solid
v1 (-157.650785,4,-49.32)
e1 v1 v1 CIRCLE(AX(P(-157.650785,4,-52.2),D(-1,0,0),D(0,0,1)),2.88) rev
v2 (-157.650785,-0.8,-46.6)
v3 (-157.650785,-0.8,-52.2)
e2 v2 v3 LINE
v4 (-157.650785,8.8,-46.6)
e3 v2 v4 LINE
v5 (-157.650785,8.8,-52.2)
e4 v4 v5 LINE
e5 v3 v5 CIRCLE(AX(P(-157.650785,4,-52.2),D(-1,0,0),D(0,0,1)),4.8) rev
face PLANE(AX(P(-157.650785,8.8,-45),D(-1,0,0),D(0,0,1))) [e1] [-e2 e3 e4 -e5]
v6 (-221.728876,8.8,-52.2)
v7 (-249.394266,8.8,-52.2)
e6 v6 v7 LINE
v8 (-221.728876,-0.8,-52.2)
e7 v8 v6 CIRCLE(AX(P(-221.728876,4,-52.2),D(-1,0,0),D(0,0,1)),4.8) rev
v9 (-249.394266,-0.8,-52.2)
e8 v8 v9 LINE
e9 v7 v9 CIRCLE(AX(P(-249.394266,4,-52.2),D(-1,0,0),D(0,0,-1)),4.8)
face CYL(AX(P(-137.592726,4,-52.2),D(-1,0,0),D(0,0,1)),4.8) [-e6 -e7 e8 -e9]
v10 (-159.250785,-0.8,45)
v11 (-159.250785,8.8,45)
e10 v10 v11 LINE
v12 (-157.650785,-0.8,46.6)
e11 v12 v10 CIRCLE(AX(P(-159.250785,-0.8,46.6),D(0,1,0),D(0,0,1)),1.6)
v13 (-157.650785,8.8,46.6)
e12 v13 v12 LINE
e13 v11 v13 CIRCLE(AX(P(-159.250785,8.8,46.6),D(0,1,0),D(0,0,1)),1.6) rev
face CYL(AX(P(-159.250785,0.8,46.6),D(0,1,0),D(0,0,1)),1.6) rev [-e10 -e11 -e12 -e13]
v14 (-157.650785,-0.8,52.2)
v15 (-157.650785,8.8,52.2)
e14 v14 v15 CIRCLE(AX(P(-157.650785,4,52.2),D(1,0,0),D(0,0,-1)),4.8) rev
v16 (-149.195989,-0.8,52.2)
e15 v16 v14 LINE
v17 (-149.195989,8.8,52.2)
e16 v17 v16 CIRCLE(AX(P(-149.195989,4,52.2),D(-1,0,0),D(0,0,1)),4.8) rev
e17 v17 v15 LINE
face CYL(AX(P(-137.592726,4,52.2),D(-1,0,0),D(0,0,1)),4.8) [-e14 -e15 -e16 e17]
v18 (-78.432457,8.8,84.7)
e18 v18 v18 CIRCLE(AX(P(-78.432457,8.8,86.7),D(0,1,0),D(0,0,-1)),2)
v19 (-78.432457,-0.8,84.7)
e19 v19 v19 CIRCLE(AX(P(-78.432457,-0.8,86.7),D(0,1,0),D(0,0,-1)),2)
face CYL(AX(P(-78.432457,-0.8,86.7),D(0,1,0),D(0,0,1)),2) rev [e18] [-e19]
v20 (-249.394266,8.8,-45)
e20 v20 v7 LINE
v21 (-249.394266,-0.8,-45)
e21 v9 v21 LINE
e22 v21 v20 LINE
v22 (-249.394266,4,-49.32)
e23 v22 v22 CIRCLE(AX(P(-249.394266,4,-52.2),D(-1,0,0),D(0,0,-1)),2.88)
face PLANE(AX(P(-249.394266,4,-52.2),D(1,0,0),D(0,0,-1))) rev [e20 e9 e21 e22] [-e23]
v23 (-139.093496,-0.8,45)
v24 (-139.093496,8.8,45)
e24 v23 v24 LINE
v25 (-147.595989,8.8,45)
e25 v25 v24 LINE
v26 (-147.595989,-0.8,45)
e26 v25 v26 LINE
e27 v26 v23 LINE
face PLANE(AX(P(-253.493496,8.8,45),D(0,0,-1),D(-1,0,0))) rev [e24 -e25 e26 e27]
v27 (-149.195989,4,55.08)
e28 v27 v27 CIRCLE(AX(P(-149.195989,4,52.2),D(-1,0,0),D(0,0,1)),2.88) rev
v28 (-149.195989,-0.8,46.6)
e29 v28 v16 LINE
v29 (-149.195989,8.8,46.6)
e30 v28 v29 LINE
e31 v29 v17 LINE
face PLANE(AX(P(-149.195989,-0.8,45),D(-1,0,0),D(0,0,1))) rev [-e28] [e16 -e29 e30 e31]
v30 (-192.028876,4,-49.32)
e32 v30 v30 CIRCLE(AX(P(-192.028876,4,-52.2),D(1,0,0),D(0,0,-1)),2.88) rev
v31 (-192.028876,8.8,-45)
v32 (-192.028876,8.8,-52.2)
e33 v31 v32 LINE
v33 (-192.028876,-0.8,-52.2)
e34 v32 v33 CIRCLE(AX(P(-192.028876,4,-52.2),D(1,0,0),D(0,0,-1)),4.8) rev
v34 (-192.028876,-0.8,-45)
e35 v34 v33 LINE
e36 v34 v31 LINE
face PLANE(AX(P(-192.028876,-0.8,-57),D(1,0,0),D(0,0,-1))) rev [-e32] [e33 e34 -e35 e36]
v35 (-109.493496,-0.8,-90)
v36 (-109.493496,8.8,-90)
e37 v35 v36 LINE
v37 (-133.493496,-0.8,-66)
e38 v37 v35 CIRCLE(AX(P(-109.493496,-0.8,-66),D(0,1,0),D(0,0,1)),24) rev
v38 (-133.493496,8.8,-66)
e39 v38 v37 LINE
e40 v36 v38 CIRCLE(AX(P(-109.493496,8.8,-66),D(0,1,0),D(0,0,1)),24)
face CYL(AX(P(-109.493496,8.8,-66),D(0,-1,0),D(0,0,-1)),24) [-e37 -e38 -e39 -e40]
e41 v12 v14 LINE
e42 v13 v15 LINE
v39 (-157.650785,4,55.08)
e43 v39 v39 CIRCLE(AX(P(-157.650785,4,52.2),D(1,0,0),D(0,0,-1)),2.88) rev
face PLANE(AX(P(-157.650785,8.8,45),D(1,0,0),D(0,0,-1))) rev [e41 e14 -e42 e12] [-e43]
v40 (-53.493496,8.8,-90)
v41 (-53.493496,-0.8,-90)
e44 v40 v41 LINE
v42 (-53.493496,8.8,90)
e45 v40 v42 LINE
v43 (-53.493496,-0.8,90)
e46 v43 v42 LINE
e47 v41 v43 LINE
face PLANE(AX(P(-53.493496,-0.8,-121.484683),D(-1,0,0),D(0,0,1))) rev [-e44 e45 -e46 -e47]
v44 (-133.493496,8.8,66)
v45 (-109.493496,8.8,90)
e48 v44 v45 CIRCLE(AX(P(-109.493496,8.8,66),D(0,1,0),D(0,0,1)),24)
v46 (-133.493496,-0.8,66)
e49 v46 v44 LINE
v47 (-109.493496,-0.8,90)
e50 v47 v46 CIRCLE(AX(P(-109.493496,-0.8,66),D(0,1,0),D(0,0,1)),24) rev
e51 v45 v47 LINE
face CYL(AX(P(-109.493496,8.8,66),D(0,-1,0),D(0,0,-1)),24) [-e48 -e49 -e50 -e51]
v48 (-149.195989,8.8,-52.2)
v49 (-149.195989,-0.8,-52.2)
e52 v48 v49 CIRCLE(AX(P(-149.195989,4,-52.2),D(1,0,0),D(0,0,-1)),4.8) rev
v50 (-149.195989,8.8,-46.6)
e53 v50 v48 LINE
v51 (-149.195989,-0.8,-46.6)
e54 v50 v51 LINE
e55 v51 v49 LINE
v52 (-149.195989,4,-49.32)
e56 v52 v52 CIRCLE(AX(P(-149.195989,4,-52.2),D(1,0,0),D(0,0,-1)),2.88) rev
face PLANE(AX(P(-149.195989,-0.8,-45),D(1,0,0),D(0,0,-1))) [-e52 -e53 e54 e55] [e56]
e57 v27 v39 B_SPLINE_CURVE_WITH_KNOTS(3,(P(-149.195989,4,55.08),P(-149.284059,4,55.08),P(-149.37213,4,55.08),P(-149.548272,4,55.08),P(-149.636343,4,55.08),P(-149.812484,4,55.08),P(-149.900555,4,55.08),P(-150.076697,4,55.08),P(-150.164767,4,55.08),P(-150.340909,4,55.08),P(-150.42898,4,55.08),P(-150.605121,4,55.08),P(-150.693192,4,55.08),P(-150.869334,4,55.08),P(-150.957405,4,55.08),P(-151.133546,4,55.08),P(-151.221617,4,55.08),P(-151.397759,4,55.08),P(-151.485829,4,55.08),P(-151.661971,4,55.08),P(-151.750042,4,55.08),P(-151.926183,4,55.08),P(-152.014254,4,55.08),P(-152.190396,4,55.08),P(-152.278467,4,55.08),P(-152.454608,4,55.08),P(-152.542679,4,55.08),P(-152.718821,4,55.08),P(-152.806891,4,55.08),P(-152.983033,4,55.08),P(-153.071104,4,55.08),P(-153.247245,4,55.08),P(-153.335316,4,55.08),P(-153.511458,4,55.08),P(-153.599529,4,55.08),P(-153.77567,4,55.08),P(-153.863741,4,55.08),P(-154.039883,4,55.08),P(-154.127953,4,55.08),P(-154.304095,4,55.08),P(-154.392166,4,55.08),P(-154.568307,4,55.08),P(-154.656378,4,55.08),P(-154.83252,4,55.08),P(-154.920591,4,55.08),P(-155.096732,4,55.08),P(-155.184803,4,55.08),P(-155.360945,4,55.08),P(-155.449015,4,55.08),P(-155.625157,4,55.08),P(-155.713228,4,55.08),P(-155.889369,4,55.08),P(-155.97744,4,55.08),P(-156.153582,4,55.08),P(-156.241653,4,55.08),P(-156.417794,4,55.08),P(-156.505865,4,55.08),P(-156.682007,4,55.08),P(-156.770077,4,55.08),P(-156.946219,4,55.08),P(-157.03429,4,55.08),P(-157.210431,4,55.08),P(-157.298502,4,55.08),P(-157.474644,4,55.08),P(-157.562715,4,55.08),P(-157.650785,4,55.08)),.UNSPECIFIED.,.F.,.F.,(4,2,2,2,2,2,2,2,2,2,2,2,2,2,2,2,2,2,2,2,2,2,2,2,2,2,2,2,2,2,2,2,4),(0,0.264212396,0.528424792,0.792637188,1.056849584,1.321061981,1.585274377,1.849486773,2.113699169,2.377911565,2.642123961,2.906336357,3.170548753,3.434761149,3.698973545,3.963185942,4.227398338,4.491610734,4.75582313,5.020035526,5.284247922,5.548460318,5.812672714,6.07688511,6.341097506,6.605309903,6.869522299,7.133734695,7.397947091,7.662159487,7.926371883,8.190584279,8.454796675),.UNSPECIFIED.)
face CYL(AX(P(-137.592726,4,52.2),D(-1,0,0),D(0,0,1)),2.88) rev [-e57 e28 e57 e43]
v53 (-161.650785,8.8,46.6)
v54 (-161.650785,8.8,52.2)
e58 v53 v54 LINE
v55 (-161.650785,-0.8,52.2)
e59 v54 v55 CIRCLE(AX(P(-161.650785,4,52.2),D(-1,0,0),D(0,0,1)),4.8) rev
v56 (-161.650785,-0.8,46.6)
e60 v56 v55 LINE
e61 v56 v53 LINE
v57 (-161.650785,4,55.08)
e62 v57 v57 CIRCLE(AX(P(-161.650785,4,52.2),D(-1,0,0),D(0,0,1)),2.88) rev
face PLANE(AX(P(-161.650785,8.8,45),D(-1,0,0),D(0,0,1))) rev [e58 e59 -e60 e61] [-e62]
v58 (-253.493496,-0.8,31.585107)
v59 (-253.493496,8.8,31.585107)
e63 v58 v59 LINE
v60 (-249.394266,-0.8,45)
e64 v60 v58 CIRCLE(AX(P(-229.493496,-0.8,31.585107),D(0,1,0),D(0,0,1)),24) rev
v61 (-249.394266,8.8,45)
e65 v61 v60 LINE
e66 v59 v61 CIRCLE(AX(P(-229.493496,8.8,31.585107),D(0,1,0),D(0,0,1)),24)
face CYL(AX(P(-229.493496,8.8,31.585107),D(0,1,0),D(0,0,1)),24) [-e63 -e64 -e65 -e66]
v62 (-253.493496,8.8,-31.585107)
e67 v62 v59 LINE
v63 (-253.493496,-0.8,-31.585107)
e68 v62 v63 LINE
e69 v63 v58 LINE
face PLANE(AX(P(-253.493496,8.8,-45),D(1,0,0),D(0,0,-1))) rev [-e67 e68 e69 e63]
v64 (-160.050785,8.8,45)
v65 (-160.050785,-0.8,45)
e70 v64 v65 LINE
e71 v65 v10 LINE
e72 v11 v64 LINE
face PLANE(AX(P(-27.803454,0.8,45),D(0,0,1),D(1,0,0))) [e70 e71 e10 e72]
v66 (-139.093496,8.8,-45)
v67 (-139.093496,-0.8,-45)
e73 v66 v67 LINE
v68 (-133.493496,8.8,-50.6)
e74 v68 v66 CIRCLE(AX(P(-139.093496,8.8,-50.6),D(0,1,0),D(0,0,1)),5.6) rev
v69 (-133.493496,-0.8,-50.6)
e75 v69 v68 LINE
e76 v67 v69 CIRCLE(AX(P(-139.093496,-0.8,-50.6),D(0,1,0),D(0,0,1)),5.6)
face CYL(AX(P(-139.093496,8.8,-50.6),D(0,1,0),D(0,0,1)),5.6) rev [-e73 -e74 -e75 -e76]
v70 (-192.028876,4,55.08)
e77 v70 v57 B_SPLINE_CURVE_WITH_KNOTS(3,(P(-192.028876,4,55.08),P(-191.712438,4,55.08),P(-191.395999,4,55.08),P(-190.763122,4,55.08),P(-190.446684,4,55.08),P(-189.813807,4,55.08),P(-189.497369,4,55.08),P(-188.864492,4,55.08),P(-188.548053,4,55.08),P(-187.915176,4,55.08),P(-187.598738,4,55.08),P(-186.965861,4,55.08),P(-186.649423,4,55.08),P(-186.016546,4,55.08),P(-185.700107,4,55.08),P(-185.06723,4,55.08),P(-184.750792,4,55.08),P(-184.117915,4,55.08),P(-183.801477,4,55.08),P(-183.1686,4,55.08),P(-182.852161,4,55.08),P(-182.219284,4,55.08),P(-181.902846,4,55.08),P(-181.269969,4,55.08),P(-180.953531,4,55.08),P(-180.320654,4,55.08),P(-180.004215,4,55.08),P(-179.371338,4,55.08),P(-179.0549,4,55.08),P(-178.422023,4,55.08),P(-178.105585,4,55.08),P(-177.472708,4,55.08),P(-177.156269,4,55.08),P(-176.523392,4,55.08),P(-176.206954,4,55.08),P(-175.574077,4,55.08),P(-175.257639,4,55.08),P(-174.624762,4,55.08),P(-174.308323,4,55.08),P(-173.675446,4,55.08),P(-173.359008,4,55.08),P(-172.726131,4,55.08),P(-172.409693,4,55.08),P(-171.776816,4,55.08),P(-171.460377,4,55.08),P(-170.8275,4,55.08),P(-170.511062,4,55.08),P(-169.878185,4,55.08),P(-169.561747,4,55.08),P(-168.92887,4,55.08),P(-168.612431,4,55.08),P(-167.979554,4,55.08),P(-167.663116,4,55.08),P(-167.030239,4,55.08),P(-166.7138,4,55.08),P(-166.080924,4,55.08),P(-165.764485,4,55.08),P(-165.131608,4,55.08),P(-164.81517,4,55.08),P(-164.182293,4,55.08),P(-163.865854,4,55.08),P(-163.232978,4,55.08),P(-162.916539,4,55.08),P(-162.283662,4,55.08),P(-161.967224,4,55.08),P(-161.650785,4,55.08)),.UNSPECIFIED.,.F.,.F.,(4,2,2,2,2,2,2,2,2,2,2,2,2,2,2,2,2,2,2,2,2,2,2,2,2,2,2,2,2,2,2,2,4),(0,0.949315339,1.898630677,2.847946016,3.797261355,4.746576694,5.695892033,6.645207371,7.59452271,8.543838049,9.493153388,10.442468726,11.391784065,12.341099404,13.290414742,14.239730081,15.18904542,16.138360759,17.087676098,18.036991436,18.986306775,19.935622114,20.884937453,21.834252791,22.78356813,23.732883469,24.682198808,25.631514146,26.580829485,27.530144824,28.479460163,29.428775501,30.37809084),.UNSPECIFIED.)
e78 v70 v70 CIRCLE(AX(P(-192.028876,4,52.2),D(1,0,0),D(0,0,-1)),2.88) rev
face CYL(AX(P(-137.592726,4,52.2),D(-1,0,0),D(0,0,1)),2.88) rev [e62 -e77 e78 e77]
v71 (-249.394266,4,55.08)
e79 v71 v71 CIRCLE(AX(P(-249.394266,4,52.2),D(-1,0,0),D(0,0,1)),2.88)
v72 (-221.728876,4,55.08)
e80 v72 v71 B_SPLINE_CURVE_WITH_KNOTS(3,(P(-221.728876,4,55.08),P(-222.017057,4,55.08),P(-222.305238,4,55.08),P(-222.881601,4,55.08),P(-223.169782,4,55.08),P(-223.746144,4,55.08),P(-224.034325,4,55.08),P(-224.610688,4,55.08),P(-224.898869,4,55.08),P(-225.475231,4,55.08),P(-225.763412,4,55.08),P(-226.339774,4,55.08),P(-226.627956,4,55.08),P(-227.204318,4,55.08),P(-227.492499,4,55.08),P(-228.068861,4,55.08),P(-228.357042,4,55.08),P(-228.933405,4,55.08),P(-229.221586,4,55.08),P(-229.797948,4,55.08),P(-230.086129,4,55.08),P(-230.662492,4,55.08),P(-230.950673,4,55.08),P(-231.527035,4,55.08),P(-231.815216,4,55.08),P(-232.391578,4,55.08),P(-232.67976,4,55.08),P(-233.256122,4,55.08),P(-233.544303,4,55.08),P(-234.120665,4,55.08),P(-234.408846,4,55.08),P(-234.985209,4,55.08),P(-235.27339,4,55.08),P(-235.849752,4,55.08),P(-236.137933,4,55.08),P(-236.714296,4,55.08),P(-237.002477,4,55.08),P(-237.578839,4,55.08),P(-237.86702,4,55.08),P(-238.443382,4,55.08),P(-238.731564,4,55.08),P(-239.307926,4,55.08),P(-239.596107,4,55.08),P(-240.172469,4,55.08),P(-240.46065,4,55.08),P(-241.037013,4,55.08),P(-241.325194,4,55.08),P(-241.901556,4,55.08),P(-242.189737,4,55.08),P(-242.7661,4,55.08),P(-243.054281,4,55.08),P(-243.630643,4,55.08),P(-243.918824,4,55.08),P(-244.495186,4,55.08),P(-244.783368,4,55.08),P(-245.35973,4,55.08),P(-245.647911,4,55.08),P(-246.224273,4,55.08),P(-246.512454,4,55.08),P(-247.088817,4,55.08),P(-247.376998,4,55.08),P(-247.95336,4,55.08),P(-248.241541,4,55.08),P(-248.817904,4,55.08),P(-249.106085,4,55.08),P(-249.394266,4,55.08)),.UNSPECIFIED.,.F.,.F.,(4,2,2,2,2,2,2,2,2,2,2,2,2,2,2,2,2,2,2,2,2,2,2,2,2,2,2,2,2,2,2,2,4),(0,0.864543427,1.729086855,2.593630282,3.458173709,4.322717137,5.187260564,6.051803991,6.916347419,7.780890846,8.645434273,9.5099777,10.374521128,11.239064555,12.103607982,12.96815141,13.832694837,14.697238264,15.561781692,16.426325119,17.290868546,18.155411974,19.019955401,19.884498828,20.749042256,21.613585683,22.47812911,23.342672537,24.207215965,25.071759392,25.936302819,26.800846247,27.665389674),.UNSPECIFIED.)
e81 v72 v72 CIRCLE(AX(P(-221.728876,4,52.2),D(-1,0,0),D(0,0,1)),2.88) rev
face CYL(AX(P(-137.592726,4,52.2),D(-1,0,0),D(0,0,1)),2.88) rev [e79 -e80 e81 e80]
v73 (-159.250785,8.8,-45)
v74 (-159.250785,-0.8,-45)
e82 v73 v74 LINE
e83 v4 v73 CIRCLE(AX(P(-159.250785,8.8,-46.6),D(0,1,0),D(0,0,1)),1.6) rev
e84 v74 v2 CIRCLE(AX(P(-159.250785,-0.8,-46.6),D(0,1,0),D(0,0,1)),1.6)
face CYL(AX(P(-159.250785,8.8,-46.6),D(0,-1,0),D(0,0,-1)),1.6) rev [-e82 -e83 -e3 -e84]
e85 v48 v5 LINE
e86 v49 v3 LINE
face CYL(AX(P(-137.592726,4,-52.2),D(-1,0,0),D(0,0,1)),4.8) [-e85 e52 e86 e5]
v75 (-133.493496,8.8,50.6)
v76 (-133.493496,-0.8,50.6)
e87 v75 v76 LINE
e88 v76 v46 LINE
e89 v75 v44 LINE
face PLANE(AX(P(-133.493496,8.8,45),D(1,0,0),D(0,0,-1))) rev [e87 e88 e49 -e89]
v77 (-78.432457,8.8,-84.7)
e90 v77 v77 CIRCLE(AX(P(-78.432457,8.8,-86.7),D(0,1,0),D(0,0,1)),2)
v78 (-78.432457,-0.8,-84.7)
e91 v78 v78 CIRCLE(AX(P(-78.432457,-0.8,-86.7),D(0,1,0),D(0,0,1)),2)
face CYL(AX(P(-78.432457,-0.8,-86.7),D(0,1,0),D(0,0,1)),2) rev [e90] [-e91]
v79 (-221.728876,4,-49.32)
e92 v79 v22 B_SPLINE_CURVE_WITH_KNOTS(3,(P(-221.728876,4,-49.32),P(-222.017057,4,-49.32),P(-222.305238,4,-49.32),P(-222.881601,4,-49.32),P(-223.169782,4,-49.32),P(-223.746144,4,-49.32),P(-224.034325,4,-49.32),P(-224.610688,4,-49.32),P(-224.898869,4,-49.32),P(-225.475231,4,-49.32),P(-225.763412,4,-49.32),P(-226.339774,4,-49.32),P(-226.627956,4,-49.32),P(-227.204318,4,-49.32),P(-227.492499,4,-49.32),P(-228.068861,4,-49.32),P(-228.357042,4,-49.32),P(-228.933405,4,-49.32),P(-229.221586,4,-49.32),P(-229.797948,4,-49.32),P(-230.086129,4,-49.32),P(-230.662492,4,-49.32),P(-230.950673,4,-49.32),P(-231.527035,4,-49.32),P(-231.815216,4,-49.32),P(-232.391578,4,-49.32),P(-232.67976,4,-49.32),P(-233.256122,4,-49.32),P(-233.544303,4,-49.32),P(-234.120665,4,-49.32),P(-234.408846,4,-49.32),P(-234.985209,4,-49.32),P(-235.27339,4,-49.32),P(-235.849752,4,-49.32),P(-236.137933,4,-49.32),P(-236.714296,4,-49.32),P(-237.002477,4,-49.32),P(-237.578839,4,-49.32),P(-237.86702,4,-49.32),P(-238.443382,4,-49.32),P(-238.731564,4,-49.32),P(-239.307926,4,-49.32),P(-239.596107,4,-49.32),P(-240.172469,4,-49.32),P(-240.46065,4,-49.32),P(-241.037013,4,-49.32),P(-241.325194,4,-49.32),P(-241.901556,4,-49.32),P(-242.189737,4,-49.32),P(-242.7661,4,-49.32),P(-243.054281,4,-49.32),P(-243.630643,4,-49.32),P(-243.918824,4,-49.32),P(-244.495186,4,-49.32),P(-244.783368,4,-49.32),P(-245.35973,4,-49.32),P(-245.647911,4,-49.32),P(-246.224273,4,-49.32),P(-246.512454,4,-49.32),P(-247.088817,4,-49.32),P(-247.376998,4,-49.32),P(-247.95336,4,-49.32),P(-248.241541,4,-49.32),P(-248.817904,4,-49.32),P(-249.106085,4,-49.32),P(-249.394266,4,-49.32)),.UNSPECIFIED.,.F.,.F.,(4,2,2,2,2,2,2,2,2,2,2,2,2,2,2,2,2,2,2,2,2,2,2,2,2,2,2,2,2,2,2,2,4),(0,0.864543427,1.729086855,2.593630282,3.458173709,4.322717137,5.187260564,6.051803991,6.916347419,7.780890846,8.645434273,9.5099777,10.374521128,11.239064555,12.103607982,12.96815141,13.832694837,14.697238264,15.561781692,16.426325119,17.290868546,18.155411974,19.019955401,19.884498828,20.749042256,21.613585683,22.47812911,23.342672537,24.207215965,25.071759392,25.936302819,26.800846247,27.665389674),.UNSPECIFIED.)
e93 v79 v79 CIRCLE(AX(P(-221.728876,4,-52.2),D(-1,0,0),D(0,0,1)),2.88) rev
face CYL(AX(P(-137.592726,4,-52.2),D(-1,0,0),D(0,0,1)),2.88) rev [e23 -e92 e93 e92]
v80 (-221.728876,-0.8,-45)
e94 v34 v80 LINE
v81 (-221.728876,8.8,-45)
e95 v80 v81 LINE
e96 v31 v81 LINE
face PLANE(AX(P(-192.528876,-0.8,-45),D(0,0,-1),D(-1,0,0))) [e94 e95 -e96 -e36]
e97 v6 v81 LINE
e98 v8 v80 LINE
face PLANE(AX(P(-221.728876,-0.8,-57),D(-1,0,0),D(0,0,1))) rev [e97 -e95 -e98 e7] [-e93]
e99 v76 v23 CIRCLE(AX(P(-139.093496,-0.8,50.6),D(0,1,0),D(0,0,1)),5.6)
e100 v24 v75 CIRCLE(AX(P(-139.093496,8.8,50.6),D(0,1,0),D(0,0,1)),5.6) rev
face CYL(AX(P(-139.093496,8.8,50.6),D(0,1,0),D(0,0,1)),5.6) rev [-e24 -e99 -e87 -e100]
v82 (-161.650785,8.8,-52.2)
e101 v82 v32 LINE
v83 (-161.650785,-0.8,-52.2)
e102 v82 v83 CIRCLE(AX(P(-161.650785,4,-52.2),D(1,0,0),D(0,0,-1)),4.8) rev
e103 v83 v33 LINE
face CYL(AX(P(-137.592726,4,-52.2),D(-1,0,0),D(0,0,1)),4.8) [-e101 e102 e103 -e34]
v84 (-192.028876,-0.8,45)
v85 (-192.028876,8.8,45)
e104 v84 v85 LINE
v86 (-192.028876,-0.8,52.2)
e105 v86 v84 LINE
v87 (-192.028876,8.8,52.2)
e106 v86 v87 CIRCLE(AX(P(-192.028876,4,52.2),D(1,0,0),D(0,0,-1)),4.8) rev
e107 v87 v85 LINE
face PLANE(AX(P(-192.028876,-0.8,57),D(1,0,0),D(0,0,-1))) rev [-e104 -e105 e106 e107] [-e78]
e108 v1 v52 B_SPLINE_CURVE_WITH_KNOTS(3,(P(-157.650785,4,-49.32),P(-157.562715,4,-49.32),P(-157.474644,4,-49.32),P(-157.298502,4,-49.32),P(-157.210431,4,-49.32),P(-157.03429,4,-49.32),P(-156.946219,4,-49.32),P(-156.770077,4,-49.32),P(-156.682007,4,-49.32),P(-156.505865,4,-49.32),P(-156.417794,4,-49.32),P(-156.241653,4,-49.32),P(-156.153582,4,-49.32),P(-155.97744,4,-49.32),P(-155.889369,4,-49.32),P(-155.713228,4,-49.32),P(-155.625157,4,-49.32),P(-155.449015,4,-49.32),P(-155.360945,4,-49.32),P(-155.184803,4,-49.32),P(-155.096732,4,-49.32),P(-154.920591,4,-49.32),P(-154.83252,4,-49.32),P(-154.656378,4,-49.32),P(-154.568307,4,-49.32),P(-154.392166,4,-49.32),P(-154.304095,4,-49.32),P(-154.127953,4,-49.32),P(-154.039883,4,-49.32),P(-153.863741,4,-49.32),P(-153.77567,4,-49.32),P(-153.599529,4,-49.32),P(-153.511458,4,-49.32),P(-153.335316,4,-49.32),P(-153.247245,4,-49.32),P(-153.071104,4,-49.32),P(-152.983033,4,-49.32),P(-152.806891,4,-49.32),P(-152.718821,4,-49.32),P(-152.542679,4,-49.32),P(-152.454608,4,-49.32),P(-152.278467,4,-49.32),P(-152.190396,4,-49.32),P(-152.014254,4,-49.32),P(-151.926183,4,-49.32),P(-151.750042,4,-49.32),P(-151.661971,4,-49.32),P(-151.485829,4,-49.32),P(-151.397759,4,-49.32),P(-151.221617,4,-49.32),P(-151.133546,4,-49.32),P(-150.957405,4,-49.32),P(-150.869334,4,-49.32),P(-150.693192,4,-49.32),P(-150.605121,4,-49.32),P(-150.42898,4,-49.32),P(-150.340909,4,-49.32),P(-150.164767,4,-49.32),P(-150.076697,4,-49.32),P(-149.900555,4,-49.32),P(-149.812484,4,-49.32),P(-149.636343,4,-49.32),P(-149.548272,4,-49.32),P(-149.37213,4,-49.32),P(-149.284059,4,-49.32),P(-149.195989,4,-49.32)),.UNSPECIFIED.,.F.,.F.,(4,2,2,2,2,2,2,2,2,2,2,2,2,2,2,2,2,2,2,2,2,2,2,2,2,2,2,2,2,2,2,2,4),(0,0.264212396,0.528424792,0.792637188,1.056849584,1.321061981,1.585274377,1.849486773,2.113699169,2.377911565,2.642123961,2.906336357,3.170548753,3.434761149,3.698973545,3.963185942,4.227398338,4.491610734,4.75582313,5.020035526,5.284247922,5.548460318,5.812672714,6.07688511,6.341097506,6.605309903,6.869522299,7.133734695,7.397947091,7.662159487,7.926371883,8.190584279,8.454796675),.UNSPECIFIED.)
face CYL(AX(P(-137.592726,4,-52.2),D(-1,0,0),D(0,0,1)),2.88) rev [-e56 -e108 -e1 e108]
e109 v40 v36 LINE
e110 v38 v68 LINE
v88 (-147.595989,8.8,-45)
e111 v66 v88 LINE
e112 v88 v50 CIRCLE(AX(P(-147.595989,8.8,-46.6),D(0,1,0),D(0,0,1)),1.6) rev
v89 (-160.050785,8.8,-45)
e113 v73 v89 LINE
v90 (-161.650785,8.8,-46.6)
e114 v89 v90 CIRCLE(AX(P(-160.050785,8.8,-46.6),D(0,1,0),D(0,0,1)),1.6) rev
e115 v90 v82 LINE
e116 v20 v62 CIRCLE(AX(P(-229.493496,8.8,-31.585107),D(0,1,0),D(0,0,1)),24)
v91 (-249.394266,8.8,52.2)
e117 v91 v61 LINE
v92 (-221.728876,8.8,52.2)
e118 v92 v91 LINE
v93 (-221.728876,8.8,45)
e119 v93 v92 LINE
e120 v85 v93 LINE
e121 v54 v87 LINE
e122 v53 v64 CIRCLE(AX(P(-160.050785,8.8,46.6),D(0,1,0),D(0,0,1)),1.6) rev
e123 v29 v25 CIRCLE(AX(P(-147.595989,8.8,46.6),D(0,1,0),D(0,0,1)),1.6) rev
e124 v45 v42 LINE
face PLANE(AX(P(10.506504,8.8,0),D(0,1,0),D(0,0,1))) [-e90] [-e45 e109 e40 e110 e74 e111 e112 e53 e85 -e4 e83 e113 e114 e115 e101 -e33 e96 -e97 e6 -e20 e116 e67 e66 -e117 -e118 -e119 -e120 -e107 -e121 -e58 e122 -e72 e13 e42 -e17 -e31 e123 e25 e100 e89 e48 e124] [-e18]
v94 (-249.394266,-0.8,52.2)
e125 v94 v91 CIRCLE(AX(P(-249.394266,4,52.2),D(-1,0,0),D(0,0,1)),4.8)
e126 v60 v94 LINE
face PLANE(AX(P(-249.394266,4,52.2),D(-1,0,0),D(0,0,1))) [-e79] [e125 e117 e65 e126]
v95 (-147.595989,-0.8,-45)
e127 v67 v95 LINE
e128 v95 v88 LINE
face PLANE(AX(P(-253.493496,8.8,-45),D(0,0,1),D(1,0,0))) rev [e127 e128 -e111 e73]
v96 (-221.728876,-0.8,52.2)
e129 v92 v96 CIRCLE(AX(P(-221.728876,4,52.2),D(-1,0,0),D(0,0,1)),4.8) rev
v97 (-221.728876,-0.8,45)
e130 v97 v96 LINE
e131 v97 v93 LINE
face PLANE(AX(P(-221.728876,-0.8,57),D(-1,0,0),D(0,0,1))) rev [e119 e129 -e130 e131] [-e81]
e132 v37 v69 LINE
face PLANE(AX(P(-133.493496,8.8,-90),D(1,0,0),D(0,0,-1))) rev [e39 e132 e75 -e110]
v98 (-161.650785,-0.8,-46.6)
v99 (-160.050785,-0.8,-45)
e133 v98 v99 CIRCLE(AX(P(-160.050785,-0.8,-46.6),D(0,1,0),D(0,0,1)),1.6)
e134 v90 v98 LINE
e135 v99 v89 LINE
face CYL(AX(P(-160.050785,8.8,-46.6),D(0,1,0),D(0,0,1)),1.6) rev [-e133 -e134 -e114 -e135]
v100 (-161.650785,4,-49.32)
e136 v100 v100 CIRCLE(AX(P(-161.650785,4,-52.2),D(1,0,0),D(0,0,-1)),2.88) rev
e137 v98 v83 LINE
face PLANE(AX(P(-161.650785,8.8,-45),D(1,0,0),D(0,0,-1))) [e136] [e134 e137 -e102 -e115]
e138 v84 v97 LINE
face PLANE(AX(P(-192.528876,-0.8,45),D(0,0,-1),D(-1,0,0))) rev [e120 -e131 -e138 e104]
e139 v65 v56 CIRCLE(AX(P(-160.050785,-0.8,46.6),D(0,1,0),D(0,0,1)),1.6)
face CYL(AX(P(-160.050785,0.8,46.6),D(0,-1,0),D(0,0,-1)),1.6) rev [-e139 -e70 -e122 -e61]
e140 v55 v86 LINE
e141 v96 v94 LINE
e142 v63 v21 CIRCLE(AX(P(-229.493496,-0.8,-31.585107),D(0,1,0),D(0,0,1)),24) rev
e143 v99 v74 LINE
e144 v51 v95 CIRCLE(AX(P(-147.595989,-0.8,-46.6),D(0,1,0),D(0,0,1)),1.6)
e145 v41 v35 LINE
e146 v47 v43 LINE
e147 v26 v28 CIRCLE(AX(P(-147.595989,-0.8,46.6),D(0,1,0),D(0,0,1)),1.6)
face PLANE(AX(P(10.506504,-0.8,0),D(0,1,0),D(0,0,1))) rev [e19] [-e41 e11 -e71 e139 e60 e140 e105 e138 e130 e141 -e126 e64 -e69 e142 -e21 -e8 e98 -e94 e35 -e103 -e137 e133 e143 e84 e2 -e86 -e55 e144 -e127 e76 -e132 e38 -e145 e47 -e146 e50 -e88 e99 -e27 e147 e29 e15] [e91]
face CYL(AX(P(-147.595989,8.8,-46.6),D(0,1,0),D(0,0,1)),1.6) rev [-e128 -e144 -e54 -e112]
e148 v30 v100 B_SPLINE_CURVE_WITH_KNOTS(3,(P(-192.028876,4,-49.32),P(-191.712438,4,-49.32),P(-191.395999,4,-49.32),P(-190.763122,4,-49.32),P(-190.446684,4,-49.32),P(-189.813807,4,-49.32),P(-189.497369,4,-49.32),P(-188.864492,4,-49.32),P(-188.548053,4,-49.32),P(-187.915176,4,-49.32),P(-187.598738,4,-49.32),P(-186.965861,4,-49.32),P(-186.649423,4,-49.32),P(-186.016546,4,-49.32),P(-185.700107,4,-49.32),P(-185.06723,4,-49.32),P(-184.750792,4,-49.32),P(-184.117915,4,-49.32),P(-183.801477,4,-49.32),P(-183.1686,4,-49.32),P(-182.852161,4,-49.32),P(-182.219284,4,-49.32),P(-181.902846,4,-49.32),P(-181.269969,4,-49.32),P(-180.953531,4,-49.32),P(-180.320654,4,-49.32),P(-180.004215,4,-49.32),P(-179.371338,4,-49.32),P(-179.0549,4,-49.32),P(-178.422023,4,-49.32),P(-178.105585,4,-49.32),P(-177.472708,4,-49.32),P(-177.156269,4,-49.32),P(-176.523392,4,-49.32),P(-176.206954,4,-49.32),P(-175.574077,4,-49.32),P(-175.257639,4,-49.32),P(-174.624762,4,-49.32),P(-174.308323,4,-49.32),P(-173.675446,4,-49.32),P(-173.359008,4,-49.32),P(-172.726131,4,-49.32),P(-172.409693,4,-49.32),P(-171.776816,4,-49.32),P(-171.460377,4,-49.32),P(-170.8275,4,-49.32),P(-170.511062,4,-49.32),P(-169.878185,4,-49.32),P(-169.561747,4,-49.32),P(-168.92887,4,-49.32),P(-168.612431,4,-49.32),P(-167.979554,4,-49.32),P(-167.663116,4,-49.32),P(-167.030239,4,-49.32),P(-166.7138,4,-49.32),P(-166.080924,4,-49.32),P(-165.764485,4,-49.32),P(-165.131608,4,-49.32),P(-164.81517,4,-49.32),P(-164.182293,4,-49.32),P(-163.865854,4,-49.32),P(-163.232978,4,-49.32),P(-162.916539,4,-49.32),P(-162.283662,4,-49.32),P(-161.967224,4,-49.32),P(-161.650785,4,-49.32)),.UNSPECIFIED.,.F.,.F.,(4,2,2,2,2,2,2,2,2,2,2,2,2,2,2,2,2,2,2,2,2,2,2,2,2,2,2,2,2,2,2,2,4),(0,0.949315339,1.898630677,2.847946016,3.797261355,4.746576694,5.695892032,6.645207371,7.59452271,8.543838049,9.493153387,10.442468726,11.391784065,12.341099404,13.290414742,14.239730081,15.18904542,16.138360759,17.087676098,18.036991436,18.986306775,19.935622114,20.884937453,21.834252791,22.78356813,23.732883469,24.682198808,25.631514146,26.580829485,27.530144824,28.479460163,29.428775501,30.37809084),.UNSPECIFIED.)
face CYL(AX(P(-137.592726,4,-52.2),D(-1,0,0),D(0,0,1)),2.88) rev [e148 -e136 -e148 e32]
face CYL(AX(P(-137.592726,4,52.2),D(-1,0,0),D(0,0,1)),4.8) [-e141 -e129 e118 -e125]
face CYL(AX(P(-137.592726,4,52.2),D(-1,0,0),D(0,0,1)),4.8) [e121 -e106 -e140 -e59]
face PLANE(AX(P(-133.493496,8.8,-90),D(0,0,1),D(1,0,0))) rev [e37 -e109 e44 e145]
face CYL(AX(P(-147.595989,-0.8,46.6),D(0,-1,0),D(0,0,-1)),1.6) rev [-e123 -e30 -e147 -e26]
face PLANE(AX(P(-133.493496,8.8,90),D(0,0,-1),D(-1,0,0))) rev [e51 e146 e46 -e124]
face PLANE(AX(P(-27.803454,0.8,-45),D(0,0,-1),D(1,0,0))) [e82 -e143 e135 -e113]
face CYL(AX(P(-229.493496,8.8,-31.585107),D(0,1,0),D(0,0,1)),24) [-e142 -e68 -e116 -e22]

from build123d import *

# Parameters (mm, degrees)
BOSS_EXTRUDE1_DEPTH      = 8
BOSS_EXTRUDE2_DEPTH      = 46.583974855
BOSS_EXTRUDE2_DEPTH_BACK = 46.58397486
SKETCH4_R                = 2.4
SKETCH6_W                = 20
SKETCH6_H                = 3
BOSS_EXTRUDE3_DEPTH      = 30
CUT_EXTRUDE2_DEPTH       = 233.497849452
CUT_EXTRUDE2_DEPTH_BACK  = 233.497849452
SKETCH7_R                = 2
SKETCH8_W                = 40
SKETCH8_H                = 3
CUT_EXTRUDE3_DEPTH       = 40
SKETCH9_R                = 2
CUT_EXTRUDE4_DEPTH       = 40
FILLET1_R                = 20
SKETCH17_R               = 1.5
CUT_EXTRUDE10_DEPTH      = 25
SCALE1_SCALE             = 1.5
SKETCH18_W               = 192.636116151
SKETCH18_H               = 297.519421562
CUT_EXTRUDE11_DEPTH      = 304.953519557
SKETCH19_W               = 5
SKETCH19_H               = 12
CUT_EXTRUDE12_DEPTH      = 56.25
SKETCH20_W               = 35
SKETCH20_H               = 20.748828486
SKETCH20_W_2             = 15.531607356
SKETCH20_H_2             = 16.854299174
CUT_EXTRUDE13_DEPTH      = 304.953519557
FILLET2_R                = 2
FILLET3_R                = 7
FILLET4_R                = 2
SCALE2_SCALE             = 0.8
SKETCH21_R               = 1.8
BOSS_EXTRUDE4_DEPTH      = 9.6
SKETCH22_R               = 2
CUT_EXTRUDE14_DEPTH      = 270.167443306
SKETCH23_W               = 3.17304631
SKETCH23_H               = 12
SKETCH23_W_2             = 2.864071414
CUT_EXTRUDE15_DEPTH      = 270.167443306
SKETCH25_W               = 3.467321183
SKETCH25_H               = 12
CUT_EXTRUDE17_DEPTH      = 270.167443306


with BuildPart() as part:
    # Sketch1 → Boss-Extrude1 (new body)
    with BuildSketch(Plane(origin=(0, 0, 0), x_dir=(1, 0, 0), z_dir=(0, 1, 0))):
        Polygon((-120, -37.5), (-120, -75), (0, -75), (0, 75), (-120, 75), (-120, 37.5), (-220, 37.5), (-220, -37.5), align=None)
    extrude(amount=BOSS_EXTRUDE1_DEPTH)

    # Sketch4 → Boss-Extrude2 (add, two sides: drawn at the far end of the back side and taken through both)
    # profile 1 of 2: a face of its own
    with BuildSketch(Plane.ZY.offset(170).offset(-BOSS_EXTRUDE2_DEPTH_BACK)):
        with BuildLine():
            Line((37.5, 8), (43.5, 8))
            ThreePointArc((43.5, 8), (47.5, 4), (43.5, 0))
            Line((43.5, 0), (37.5, 0))
            Line((37.5, 0), (37.5, 8))
        make_face()
        with Locations((43.5, 4)):
            Circle(SKETCH4_R, mode=Mode.SUBTRACT)
    # profile 2 of 2: a face of its own
    with BuildSketch(Plane.ZY.offset(170).offset(-BOSS_EXTRUDE2_DEPTH_BACK)):
        with BuildLine():
            Line((-37.5, 0), (-43.5, 0))
            ThreePointArc((-43.5, 0), (-47.5, 4), (-43.5, 8))
            Line((-43.5, 8), (-37.5, 8))
            Line((-37.5, 8), (-37.5, 0))
        make_face()
        with Locations((-43.5, 4)):
            Circle(SKETCH4_R, mode=Mode.SUBTRACT)
    extrude(amount=BOSS_EXTRUDE2_DEPTH + BOSS_EXTRUDE2_DEPTH_BACK)

    # Sketch6 → Boss-Extrude3 (add)
    with BuildSketch(Plane(origin=(0, 0, 0), x_dir=(0, 0, -1), z_dir=(1, 0, 0))):
        with Locations((-50, 4)):
            Rectangle(SKETCH6_W, SKETCH6_H)
        with Locations((50, 4)):
            Rectangle(SKETCH6_W, SKETCH6_H)
    extrude(amount=BOSS_EXTRUDE3_DEPTH)

    # Sketch7 → Cut-Extrude2 (cut, two sides: drawn at the far end of the back side and taken through both)
    with BuildSketch(Plane(origin=(0, 5.5, 0), x_dir=(1, 0, 0), z_dir=(0, 1, 0)).offset(-CUT_EXTRUDE2_DEPTH_BACK)):
        with Locations(Location((22.5, 50, 0), (0, 0, 270))):
            Circle(SKETCH7_R)
        with Locations(Location((22.5, -50, 0), (0, 0, 270))):
            Circle(SKETCH7_R)
    extrude(amount=CUT_EXTRUDE2_DEPTH + CUT_EXTRUDE2_DEPTH_BACK, mode=Mode.SUBTRACT)

    # Sketch8 → Cut-Extrude3 (cut)
    with BuildSketch(Plane(origin=(0, 0, 0), x_dir=(0, 0, -1), z_dir=(1, 0, 0))):
        with Locations((0, 4)):
            Rectangle(SKETCH8_W, SKETCH8_H)
    extrude(amount=-CUT_EXTRUDE3_DEPTH, mode=Mode.SUBTRACT)

    # Sketch9 → Cut-Extrude4 (cut)
    with BuildSketch(Plane(origin=(0, 8, 0), x_dir=(1, 0, 0), z_dir=(0, 1, 0))):
        with Locations(Location((-32.5, 0, 0), (0, 0, 270))):
            Circle(SKETCH9_R)
    extrude(amount=-CUT_EXTRUDE4_DEPTH, mode=Mode.SUBTRACT)

    # Fillet1
    # the kernel refuses this fillet: 20 mm, written as the material it takes off along each edge
    with BuildSketch(Plane(origin=(-220, -27.947694226, -37.5), x_dir=(0, 0, 1), z_dir=(0, 1, 0))) as fillet1_piece_1:
        with BuildLine():
            CenterArc((11.17907769, 20), FILLET1_R, 236.01651728, 33.98348272)
            Line((0, 3.416025145), (-0.223581554, 3.084345648))
            ThreePointArc((-0.223581554, 3.084345648), (-0.4, 1.708012572), (-0.4, 0))
            Line((-0.4, 0), (0, -0.4))
            Line((0, -0.4), (11.17907769, -0.4))
            Line((11.17907769, -0.4), (11.17907769, 0))
        make_face()
    extrude(amount=63.895388452, mode=Mode.SUBTRACT)
    with BuildSketch(Plane(origin=(-220, -27.947694226, 37.5), x_dir=(1, 0, 0), z_dir=(0, 1, 0))) as fillet1_piece_2:
        with BuildLine():
            CenterArc((20, 11.17907769), FILLET1_R, 180, 33.98348272)
            Line((0, 11.17907769), (-0.4, 11.17907769))
            Line((-0.4, 11.17907769), (-0.4, 0))
            Line((-0.4, 0), (0, -0.4))
            ThreePointArc((0, -0.4), (1.708012572, -0.4), (3.084345648, -0.223581554))
            Line((3.084345648, -0.223581554), (3.416025145, 0))
        make_face()
    extrude(amount=63.895388452, mode=Mode.SUBTRACT)
    with BuildSketch(Plane(origin=(-120, -50, -75), x_dir=(1, 0, 0), z_dir=(0, 1, 0)), Plane(origin=(-120, -50, 75), x_dir=(0, 0, -1), z_dir=(0, 1, 0))) as fillet1_piece_3:
        with BuildLine():
            CenterArc((FILLET1_R, -FILLET1_R), FILLET1_R, 90, 90)
            Line((0, -FILLET1_R), (-FILLET1_R * 0.02, -FILLET1_R))
            Line((-FILLET1_R * 0.02, -FILLET1_R), (-FILLET1_R * 0.02, FILLET1_R * 0.02))
            Line((-FILLET1_R * 0.02, FILLET1_R * 0.02), (FILLET1_R, FILLET1_R * 0.02))
            Line((FILLET1_R, FILLET1_R * 0.02), (FILLET1_R, 0))
        make_face()
    extrude(amount=108, mode=Mode.SUBTRACT)

    # Sketch17 → Cut-Extrude10 (cut)
    with BuildSketch(Plane(origin=(0, 8, 0), x_dir=(1, 0, 0), z_dir=(0, 1, 0))):
        with Locations(Location((-75, 72.25, 0), (0, 0, 270))):
            Circle(SKETCH17_R)
        with Locations(Location((-25, 72.25, 0), (0, 0, 270))):
            Circle(SKETCH17_R)
        with Locations(Location((-25, -72.25, 0), (0, 0, 270))):
            Circle(SKETCH17_R)
        with Locations(Location((-75, -72.25, 0), (0, 0, 270))):
            Circle(SKETCH17_R)
    extrude(amount=-CUT_EXTRUDE10_DEPTH, mode=Mode.SUBTRACT)


with BuildPart() as part_1:
    # Scale1: scaled about (-95.774895805, 4, 0)
    add(part.part.scale(SCALE1_SCALE).moved(Location((47.887447902, -2, 0))))

    # Sketch18 → Cut-Extrude11 (cut, through all)
    with BuildSketch(Plane(origin=(0, 10, 0), x_dir=(1, 0, 0), z_dir=(0, 1, 0))):
        with Locations((64.205505977, 3.096142809)):
            Rectangle(SKETCH18_W, SKETCH18_H)
    extrude(amount=-CUT_EXTRUDE11_DEPTH, mode=Mode.SUBTRACT)

    # Sketch19 → Cut-Extrude12 (cut)
    with BuildSketch(Plane.XY.offset(112.5)):
        with Locations((-164.809163738, 4)):
            Rectangle(SKETCH19_W, SKETCH19_H)
    cut_extrude12 = extrude(amount=-CUT_EXTRUDE12_DEPTH, mode=Mode.SUBTRACT)

    # Mirror2: Cut-Extrude12 across plane
    add(cut_extrude12.mirror(Plane.XY), mode=Mode.SUBTRACT)

    # Sketch20 → Cut-Extrude13 (cut, through all)
    with BuildSketch(Plane(origin=(0, 10, 0), x_dir=(1, 0, 0), z_dir=(0, 1, 0))):
        with Locations((-223.406777288, -66.624414243)):
            Rectangle(SKETCH20_W, SKETCH20_H)
        with Locations((-143.974864216, -64.677149587)):
            Rectangle(SKETCH20_W_2, SKETCH20_H_2)
    cut_extrude13 = extrude(amount=-CUT_EXTRUDE13_DEPTH, mode=Mode.SUBTRACT)

    # Fillet2
    fillet2_edges = [part_1.edges().sort_by_distance(p)[0] for p in [
        (-162.309163738, 4, 56.25),
        (-167.309163738, 4, 56.25),
        (-205.906777288, 4, 56.25),
        (-240.906777288, 4, 56.25),
        (-151.740667894, 4, 56.25),
    ]]
    fillet(fillet2_edges, radius=FILLET2_R)

    # Mirror3: Cut-Extrude13 across plane
    add(cut_extrude13.mirror(Plane.XY), mode=Mode.SUBTRACT)

    # Fillet3
    fillet3_edges = [part_1.edges().sort_by_distance(p)[0] for p in [
        (-132.112552097, 4, 56.25),
        (-132.112552097, 4, -56.25),
    ]]
    fillet(fillet3_edges, radius=FILLET3_R)

    # Fillet4
    fillet4_edges = [part_1.edges().sort_by_distance(p)[0] for p in [
        (-162.309163738, 4, -56.25),
        (-167.309163738, 4, -56.25),
        (-240.906777288, 4, -56.25),
        (-205.906777288, 4, -56.25),
        (-151.740667894, 4, -56.25),
    ]]
    fillet(fillet4_edges, radius=FILLET4_R)


with BuildPart() as part_2:
    # Scale2: scaled about (-139.017271823, 4, 0)
    add(part_1.part.scale(SCALE2_SCALE).moved(Location((-27.803454365, 0.8, 0))))

    # Sketch21 → Boss-Extrude4 (add)
    with BuildSketch(Plane(origin=(0, 8.8, 0), x_dir=(1, 0, 0), z_dir=(0, 1, 0))):
        with Locations((-79.493496043, 86.7)):
            Circle(SKETCH21_R)
        with Locations((-79.493496043, -86.7)):
            Circle(SKETCH21_R)
    extrude(amount=-BOSS_EXTRUDE4_DEPTH)

    # Sketch22 → Cut-Extrude14 (cut, through all)
    with BuildSketch(Plane(origin=(0, 8.8, 0), x_dir=(1, 0, 0), z_dir=(0, 1, 0))):
        with Locations(Location((-78.432456753, 86.7, 0), (0, 0, 270))):
            Circle(SKETCH22_R)
        with Locations(Location((-78.432456753, -86.7, 0), (0, 0, 90))):
            Circle(SKETCH22_R)
    extrude(amount=-CUT_EXTRUDE14_DEPTH, mode=Mode.SUBTRACT)

    # Sketch23 → Cut-Extrude15 (cut, through all)
    with BuildSketch(Plane(origin=(0, 8.8, 0), x_dir=(1, 0, 0), z_dir=(0, 1, 0))):
        with Locations((-219.44235304, 51)):
            Rectangle(SKETCH23_W, SKETCH23_H)
        with Locations((-219.44235304, -51)):
            Rectangle(SKETCH23_W, SKETCH23_H)
        with Locations((-193.460911902, 51)):
            Rectangle(SKETCH23_W_2, SKETCH23_H)
        with Locations((-193.460911902, -51)):
            Rectangle(SKETCH23_W_2, SKETCH23_H)
    extrude(amount=-CUT_EXTRUDE15_DEPTH, mode=Mode.SUBTRACT)

    # Sketch25 → Cut-Extrude17 (cut, through all)
    with BuildSketch(Plane(origin=(0, 8.8, 0), x_dir=(1, 0, 0), z_dir=(0, 1, 0))):
        with Locations((-219.995215604, -51)):
            Rectangle(SKETCH25_W, SKETCH25_H)
        with Locations((-219.995215604, 51)):
            Rectangle(SKETCH25_W, SKETCH25_H)
    extrude(amount=-CUT_EXTRUDE17_DEPTH, mode=Mode.SUBTRACT)


solid = part_2.part
